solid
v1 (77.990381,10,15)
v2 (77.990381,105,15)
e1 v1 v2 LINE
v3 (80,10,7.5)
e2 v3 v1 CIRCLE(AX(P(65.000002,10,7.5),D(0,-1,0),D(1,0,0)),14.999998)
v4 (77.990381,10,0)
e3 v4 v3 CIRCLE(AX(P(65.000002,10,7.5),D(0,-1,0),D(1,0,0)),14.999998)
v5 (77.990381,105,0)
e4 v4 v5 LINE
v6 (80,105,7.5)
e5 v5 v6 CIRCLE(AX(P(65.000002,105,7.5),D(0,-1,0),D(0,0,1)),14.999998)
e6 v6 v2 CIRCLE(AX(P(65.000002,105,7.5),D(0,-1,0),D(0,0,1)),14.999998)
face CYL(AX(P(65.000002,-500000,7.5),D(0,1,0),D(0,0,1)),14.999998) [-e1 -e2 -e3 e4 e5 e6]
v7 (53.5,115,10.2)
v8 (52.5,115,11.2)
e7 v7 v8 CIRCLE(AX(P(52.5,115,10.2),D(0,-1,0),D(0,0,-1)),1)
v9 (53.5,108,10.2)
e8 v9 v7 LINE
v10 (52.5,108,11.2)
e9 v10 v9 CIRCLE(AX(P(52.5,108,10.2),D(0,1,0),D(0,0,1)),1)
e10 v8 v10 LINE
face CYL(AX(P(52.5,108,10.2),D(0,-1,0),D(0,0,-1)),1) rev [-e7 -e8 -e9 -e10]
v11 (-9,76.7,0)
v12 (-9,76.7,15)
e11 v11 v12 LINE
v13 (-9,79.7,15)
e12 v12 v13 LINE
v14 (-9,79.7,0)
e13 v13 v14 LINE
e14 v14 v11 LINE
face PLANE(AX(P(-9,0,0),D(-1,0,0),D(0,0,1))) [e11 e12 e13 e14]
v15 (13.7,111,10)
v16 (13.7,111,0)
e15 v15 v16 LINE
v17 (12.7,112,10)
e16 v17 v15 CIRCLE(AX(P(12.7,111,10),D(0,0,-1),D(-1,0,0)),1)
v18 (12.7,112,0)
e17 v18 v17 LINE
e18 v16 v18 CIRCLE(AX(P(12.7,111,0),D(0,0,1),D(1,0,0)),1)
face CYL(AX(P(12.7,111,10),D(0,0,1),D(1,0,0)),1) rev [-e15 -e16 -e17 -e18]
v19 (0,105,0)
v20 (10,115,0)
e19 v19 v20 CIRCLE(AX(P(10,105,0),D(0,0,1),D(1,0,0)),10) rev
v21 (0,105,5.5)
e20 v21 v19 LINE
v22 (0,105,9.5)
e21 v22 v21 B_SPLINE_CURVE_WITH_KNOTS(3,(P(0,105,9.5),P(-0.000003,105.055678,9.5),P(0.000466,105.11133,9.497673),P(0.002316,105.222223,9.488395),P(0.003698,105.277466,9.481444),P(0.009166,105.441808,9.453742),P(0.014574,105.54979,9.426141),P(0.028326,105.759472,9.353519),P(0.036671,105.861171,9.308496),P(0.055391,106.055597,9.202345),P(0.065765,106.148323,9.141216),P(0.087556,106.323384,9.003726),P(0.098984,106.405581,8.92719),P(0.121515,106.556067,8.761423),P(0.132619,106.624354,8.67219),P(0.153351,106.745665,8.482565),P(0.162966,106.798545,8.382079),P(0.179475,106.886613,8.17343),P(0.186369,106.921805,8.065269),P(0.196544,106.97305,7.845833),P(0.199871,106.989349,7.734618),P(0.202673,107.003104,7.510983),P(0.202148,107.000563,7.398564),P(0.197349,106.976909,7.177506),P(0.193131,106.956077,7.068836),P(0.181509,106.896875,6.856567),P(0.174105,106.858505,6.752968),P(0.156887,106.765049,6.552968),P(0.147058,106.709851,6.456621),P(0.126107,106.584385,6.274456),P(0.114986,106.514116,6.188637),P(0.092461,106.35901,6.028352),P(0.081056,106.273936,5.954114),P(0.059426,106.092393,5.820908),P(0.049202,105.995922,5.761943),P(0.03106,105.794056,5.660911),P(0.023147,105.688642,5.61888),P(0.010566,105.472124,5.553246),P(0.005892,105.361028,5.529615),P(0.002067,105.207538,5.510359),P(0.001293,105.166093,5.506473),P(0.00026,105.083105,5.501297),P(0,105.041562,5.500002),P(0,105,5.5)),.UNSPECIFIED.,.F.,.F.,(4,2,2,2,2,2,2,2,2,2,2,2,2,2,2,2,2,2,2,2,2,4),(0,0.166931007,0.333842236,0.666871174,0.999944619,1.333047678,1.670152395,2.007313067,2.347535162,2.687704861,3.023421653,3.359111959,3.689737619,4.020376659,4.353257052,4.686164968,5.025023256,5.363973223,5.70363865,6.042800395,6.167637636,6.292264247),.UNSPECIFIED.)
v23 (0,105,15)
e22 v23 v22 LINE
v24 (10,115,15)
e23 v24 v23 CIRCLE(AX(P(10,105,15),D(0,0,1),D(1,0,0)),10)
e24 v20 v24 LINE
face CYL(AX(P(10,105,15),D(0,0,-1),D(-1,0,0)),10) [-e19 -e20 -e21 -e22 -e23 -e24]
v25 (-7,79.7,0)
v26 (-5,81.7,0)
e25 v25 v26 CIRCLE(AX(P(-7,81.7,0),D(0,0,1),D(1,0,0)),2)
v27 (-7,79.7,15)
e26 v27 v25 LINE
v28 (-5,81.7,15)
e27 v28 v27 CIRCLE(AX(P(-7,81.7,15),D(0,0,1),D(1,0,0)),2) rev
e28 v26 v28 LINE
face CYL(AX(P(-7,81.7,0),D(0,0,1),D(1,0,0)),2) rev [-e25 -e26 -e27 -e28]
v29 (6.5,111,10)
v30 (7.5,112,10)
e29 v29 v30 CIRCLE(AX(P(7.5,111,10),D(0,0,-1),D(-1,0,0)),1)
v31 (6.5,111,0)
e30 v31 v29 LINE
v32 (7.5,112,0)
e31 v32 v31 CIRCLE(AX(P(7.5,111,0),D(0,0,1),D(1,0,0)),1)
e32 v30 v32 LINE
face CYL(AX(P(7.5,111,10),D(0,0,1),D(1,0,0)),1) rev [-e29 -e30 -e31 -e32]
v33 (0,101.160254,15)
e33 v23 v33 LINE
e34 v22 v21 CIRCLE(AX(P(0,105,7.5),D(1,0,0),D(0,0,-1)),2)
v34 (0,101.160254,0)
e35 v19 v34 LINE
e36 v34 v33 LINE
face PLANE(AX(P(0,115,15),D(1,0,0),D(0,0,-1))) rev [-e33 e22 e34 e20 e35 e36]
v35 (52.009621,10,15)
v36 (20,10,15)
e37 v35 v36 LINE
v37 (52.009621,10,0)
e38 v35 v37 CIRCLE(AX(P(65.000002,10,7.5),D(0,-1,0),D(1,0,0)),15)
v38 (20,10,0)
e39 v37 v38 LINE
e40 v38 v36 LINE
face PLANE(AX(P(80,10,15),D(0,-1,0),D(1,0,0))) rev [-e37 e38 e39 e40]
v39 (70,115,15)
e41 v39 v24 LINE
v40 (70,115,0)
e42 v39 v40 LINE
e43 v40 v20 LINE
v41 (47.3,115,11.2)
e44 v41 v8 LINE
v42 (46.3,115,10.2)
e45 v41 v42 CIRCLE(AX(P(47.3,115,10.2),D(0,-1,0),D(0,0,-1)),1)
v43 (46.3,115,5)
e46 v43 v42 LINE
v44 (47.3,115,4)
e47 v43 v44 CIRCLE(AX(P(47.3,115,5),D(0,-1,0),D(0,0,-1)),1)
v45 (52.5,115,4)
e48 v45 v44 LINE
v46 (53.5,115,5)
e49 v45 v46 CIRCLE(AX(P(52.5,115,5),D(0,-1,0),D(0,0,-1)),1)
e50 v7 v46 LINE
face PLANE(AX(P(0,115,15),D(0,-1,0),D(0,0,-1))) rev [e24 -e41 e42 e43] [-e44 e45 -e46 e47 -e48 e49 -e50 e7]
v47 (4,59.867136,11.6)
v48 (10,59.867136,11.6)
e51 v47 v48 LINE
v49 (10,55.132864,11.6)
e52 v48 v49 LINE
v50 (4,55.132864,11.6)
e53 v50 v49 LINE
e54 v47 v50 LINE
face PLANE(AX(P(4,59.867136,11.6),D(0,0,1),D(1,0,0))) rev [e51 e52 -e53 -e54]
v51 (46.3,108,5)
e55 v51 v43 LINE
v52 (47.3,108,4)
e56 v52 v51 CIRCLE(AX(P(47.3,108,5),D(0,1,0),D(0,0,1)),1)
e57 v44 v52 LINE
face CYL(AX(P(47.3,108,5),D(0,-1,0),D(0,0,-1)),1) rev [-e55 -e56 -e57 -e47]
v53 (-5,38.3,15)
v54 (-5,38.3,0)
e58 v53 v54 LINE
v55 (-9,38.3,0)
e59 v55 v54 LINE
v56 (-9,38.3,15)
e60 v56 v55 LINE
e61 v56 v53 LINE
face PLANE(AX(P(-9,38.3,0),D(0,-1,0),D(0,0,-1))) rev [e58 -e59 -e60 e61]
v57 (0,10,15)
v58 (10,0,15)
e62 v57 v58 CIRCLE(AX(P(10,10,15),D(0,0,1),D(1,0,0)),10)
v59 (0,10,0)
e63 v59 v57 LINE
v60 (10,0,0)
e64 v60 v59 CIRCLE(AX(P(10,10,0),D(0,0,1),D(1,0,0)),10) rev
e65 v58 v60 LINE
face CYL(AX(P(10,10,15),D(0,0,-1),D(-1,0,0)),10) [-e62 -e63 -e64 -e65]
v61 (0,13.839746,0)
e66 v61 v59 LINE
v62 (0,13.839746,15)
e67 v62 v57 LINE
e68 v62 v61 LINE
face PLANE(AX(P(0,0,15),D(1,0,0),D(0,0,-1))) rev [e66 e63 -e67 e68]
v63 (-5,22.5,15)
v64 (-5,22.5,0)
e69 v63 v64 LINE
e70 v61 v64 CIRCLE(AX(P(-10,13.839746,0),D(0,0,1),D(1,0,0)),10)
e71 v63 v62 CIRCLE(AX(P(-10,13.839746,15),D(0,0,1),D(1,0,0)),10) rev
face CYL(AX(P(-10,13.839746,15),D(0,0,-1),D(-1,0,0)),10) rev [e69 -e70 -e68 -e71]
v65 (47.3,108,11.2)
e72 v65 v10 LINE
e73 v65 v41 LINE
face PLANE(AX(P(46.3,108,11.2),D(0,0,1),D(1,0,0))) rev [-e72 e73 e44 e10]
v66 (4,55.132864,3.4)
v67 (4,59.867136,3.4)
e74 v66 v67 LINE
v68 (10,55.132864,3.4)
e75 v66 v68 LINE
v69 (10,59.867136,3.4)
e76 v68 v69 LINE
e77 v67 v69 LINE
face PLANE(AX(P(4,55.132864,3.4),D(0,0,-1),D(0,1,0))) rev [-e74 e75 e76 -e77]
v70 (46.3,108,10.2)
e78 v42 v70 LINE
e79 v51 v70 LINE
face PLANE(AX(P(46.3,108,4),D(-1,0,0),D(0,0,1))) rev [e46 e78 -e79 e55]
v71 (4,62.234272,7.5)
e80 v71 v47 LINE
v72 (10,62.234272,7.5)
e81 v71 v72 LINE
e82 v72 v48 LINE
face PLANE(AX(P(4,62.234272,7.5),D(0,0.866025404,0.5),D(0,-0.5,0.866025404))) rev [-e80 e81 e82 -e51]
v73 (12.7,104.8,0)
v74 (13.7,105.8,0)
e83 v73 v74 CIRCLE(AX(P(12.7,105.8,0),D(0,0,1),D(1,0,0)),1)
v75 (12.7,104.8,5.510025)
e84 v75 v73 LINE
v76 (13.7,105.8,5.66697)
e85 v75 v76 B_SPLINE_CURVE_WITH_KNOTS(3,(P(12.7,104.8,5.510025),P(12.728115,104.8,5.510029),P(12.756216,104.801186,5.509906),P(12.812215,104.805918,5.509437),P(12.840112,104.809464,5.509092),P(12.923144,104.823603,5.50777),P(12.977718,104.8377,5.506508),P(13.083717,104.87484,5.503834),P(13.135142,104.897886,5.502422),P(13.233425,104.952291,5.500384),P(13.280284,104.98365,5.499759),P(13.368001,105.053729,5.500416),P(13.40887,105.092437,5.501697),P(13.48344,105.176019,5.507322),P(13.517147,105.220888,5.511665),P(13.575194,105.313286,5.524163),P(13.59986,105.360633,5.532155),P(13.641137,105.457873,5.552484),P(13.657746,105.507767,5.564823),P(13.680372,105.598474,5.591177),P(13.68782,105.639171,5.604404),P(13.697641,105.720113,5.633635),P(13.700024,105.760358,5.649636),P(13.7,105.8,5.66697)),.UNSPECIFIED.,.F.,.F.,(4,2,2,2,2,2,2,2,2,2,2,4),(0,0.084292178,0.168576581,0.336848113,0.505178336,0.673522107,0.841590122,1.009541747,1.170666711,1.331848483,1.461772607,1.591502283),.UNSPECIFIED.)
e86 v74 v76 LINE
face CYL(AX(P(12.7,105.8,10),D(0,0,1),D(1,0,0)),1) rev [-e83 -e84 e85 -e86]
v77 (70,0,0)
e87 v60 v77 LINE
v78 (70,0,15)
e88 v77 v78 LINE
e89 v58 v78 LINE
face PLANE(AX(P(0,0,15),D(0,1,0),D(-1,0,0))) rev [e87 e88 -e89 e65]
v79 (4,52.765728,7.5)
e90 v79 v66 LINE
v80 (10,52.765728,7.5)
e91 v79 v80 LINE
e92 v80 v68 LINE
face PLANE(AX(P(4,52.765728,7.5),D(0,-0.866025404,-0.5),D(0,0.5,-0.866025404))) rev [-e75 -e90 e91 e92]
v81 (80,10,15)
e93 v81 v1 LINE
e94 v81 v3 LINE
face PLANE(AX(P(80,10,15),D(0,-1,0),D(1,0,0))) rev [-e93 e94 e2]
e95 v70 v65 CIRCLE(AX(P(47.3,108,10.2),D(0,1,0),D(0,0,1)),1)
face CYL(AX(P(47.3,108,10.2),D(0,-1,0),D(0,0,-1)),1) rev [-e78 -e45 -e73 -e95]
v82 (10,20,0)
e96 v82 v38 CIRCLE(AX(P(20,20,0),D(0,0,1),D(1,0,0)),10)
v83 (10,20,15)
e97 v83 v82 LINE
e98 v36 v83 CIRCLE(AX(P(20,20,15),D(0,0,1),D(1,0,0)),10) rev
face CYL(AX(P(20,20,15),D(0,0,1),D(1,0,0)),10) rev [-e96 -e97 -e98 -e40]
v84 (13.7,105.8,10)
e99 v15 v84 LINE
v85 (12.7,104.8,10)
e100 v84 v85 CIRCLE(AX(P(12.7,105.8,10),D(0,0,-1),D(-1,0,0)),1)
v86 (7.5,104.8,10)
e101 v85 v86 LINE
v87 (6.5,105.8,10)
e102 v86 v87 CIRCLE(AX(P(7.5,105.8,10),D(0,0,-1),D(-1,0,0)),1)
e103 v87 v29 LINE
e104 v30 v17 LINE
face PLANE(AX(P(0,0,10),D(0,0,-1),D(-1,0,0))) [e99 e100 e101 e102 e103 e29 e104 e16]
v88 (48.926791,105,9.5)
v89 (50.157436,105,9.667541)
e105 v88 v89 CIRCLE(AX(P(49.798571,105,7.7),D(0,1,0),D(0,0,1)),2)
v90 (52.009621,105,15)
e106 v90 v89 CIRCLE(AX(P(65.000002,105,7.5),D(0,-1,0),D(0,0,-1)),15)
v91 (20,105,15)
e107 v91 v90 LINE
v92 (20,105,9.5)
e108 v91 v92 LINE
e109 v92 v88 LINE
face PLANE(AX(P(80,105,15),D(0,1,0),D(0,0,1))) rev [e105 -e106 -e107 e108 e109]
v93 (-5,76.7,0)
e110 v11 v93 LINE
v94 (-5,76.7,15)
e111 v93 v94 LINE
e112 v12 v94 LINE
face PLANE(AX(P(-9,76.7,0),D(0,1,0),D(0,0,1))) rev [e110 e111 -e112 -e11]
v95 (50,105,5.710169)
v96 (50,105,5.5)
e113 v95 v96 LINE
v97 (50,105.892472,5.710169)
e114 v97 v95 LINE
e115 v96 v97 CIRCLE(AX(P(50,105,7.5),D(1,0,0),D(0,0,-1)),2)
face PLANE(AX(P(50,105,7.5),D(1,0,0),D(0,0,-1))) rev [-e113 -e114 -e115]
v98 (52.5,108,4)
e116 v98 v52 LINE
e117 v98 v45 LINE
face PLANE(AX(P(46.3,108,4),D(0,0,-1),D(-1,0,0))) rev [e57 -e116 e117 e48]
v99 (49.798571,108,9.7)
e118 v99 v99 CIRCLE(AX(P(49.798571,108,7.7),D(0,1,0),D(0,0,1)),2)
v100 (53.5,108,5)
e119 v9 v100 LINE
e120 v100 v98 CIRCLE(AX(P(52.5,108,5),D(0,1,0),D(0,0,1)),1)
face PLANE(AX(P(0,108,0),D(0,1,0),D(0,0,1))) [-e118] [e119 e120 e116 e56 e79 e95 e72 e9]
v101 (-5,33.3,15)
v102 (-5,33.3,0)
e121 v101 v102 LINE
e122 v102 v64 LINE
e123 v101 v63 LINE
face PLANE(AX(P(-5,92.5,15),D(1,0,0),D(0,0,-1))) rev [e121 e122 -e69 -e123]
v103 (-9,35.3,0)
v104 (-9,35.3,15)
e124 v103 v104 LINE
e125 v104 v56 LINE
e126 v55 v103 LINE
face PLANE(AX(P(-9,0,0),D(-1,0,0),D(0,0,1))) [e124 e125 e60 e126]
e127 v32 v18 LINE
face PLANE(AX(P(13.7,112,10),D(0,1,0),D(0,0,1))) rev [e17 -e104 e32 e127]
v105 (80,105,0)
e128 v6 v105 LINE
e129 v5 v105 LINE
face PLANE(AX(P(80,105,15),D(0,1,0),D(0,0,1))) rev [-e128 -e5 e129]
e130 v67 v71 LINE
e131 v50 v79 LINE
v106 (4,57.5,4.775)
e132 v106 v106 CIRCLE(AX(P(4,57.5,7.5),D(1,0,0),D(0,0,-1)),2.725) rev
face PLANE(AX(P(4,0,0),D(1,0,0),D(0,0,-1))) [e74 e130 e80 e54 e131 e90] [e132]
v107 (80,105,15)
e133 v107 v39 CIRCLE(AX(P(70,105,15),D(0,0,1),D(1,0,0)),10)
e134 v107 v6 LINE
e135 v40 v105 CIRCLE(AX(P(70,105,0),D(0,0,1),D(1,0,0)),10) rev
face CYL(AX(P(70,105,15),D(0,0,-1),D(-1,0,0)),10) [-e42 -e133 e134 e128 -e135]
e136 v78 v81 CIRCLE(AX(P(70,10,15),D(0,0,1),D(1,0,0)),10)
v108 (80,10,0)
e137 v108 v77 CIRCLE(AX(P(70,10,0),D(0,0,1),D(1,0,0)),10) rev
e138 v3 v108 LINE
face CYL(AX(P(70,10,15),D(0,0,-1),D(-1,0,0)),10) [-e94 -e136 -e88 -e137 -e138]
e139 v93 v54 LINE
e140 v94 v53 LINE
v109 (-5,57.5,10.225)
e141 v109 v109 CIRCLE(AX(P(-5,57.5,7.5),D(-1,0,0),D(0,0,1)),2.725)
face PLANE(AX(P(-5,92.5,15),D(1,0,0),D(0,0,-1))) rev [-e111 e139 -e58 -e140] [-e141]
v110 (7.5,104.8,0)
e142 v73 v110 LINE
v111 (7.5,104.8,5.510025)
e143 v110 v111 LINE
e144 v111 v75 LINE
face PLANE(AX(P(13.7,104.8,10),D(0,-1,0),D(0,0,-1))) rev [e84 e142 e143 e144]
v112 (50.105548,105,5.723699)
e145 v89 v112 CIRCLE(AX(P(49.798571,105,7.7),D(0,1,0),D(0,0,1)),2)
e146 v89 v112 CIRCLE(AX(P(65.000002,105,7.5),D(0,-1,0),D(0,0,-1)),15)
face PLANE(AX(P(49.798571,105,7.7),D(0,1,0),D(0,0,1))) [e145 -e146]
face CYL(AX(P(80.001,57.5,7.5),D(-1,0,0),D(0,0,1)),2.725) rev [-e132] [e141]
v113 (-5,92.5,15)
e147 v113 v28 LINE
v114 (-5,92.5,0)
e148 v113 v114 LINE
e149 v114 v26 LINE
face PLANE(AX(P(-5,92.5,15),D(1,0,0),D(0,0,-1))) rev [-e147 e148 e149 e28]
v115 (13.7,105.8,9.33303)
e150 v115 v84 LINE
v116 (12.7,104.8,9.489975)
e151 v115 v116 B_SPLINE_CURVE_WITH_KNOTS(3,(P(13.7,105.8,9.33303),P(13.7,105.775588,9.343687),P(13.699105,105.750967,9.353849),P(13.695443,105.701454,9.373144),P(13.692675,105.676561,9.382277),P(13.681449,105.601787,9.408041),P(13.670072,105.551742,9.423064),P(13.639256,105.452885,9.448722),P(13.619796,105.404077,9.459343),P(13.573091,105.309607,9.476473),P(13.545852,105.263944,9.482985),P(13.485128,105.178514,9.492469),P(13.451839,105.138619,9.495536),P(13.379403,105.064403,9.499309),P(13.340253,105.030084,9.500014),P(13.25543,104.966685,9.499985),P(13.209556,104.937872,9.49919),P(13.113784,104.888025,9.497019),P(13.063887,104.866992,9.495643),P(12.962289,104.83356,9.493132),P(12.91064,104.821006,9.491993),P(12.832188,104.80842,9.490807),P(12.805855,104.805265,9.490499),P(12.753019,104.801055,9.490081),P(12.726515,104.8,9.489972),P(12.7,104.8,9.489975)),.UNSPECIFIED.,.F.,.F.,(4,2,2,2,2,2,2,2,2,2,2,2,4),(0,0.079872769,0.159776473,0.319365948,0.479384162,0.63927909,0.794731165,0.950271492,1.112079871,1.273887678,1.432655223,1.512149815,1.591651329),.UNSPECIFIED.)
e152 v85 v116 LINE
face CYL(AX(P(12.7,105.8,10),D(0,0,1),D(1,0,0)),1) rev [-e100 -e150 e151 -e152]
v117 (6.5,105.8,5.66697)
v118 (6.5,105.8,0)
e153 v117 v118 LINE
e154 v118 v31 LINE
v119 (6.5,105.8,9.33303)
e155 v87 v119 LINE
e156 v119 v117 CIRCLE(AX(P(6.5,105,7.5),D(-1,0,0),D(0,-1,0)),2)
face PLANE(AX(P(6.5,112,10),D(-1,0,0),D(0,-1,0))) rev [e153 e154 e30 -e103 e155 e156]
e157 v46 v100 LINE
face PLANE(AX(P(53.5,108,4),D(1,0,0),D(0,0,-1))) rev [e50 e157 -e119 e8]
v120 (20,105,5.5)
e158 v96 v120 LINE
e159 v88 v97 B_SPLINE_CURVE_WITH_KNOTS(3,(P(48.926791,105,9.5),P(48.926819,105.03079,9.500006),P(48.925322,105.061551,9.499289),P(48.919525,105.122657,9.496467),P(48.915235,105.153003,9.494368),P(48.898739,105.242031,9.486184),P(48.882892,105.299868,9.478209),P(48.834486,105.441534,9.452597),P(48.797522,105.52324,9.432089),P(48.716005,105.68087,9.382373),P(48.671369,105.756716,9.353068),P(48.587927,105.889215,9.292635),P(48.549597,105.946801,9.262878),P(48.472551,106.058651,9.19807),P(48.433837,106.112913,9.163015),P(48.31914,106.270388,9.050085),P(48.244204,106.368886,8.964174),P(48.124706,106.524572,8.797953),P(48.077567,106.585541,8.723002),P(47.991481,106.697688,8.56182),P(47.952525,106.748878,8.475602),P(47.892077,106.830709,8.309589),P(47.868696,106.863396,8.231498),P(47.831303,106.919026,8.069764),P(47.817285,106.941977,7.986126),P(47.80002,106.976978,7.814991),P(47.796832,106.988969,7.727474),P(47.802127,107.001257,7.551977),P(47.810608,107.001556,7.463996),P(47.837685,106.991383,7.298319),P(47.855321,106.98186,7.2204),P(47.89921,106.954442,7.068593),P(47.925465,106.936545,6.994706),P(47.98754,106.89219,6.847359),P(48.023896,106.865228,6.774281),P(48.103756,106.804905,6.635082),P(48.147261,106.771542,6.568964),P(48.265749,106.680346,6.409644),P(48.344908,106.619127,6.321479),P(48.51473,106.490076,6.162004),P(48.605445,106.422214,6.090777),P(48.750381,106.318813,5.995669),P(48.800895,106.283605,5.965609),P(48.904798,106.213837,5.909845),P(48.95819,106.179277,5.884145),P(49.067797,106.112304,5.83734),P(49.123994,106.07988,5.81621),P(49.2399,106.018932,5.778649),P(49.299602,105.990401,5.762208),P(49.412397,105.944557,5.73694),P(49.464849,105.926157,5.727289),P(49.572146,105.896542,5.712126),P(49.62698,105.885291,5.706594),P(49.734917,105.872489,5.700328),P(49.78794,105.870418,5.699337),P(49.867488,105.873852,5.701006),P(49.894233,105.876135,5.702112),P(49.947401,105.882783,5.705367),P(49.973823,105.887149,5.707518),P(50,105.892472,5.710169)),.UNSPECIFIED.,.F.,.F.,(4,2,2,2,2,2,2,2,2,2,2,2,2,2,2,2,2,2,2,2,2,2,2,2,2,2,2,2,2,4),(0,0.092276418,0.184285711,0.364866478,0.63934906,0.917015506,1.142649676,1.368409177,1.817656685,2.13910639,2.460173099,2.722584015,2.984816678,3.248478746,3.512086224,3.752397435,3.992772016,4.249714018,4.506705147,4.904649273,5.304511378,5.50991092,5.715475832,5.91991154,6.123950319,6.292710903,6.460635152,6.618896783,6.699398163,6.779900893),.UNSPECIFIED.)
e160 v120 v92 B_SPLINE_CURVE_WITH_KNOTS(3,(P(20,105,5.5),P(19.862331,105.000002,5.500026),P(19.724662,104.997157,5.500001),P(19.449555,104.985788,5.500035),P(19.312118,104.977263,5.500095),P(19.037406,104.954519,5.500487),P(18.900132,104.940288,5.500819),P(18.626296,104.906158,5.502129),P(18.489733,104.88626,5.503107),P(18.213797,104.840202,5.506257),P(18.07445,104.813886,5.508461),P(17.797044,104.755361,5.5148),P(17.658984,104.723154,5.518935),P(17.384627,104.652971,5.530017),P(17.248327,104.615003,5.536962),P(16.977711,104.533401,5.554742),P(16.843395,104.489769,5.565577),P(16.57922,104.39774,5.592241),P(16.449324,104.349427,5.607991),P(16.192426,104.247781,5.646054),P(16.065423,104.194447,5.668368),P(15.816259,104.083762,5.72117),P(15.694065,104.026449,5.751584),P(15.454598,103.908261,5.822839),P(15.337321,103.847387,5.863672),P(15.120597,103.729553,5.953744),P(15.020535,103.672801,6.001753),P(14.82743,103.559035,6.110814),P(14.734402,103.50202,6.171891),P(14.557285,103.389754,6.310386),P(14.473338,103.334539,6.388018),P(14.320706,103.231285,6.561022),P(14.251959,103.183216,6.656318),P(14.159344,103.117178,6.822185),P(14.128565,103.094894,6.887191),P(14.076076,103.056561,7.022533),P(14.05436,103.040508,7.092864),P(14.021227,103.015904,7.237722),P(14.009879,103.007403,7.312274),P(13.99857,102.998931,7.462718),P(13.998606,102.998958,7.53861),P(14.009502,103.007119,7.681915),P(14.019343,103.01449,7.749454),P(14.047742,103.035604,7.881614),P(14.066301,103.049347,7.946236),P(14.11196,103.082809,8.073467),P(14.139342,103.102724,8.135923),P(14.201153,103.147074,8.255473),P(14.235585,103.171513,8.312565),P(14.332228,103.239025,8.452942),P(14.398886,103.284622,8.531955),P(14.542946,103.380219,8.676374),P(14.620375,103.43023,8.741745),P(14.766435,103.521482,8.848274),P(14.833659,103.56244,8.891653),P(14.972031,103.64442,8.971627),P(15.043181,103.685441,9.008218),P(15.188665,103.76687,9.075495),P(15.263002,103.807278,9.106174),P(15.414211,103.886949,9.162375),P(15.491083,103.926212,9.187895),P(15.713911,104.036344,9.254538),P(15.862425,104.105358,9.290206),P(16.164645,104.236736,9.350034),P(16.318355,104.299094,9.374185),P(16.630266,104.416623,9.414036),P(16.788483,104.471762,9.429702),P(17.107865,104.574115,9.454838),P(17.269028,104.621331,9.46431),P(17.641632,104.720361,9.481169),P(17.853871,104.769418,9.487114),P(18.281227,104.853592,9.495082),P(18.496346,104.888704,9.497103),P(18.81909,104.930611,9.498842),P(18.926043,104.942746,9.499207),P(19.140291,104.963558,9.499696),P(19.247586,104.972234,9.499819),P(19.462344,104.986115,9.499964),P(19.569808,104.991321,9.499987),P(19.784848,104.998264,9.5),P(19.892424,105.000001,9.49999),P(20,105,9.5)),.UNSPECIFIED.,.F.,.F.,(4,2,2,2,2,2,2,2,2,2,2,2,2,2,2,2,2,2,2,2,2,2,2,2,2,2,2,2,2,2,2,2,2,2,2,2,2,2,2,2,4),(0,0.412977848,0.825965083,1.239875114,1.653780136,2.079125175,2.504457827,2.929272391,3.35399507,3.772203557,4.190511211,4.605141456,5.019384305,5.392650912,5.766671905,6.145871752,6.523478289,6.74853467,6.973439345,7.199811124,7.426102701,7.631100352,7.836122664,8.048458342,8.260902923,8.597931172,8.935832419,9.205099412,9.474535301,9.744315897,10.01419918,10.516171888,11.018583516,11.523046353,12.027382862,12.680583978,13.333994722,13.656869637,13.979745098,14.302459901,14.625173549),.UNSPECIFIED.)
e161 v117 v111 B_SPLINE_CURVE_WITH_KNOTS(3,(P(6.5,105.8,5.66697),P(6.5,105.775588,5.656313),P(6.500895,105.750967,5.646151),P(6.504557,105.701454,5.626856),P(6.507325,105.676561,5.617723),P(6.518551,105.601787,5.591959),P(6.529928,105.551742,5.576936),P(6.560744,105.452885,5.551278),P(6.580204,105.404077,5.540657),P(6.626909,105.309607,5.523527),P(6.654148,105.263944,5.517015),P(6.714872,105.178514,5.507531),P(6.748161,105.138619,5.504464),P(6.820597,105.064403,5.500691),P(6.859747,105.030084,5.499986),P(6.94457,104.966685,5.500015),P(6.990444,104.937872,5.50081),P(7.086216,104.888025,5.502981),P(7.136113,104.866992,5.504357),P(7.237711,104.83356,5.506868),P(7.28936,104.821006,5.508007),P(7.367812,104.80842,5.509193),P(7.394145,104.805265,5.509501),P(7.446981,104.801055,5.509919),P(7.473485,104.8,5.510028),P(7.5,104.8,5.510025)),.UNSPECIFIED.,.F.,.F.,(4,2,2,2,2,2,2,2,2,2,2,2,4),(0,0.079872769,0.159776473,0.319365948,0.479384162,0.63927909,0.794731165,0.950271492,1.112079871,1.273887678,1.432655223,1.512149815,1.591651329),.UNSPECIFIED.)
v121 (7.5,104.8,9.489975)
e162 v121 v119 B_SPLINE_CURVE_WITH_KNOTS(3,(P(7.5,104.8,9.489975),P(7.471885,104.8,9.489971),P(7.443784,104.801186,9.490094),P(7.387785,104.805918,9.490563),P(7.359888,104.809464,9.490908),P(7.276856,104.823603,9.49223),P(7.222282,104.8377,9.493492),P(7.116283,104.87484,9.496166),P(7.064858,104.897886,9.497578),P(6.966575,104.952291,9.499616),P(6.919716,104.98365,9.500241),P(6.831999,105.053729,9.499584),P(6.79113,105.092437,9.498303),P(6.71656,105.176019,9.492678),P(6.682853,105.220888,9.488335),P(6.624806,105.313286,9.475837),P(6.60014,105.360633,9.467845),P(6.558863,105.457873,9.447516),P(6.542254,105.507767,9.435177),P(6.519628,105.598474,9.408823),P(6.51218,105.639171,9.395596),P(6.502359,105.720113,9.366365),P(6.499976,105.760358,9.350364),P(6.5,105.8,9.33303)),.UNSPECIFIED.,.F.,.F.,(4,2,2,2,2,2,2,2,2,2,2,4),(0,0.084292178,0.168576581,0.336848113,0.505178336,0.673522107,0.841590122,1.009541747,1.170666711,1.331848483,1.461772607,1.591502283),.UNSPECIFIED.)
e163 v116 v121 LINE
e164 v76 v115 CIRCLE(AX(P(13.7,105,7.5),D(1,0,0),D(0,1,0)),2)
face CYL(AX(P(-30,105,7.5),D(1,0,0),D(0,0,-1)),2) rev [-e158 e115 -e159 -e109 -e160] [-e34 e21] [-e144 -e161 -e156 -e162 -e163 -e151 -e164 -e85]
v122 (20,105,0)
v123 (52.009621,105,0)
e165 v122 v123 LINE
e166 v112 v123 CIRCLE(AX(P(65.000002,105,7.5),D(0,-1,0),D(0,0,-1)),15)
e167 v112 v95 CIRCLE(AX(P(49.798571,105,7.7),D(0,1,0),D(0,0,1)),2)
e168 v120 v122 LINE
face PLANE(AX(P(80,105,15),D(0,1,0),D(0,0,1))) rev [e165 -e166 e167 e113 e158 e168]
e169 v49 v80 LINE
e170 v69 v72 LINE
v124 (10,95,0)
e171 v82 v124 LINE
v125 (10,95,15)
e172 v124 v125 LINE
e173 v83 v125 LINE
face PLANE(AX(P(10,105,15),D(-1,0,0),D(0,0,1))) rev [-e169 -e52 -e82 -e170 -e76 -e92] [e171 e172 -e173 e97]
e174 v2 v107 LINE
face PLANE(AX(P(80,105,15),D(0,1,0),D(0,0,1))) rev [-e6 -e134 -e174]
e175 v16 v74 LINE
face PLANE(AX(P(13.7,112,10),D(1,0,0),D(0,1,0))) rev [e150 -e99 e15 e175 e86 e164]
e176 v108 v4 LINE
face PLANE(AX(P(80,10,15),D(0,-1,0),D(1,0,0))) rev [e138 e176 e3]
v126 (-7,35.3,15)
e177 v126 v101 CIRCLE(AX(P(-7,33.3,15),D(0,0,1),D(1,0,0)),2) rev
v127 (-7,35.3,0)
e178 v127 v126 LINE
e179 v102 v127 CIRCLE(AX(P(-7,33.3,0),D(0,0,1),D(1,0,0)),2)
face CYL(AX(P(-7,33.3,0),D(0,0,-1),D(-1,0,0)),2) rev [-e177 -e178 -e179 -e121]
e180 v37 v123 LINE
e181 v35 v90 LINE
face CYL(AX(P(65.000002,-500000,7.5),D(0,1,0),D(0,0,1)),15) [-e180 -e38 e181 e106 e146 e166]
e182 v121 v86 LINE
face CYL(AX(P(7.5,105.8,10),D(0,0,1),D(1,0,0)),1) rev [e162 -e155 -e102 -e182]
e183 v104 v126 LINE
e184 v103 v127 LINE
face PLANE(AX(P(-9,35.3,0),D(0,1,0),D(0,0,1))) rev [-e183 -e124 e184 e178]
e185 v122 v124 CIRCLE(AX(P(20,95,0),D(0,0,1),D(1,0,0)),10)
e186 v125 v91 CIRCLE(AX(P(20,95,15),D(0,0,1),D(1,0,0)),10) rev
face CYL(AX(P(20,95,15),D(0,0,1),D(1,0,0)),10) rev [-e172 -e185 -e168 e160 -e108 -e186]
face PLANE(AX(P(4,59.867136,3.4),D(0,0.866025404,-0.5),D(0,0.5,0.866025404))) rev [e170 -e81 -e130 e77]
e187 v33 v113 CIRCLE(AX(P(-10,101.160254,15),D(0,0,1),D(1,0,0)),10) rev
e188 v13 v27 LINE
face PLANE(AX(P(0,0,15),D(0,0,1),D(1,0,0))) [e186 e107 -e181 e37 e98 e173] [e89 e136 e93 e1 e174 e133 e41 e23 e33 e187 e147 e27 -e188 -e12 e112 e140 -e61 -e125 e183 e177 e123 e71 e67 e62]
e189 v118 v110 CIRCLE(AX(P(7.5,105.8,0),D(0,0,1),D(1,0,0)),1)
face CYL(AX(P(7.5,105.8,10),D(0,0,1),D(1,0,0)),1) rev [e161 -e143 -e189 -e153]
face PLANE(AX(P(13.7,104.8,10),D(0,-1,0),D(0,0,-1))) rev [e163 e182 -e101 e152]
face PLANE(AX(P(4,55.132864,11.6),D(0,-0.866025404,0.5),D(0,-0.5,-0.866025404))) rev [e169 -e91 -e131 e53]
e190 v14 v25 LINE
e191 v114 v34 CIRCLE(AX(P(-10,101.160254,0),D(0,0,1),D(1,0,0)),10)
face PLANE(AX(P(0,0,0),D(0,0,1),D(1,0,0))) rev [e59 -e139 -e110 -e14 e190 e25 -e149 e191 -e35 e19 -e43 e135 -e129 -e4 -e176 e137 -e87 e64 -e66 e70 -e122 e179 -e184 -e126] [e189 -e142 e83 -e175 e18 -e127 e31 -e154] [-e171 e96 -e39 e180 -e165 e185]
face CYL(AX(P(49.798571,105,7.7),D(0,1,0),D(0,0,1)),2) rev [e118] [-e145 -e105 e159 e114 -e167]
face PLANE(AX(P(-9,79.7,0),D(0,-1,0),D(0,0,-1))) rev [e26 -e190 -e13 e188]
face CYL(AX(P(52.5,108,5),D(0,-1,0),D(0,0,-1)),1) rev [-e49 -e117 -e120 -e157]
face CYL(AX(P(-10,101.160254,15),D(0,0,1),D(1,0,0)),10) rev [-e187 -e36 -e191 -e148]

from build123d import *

# Parameters (mm, degrees)
MAIN_BODY_DEPTH             = 15
M5_HOLE_REACH               = 145.788
SKETCH2_R                   = 2.725
GRIP_REACH                  = 134.853
SKETCH8_W                   = 7.2
SKETCH8_H                   = 7.2
BUTTON_1_DEPTH              = 7
SKETCH9_R                   = 2
HOLE_WIRES_BUTTON_1_DEPTH   = 3
OUTER_FILLET_R              = 10
SKETCH13_W                  = 7.2
SKETCH13_H                  = 7.2
BUTTON_2_DEPTH              = 10
BUTTONS_FILLET_R            = 1
SKETCH16_R                  = 2
WIRE_ROUTING_DEPTH          = 40
M5_NUT_DEPTH                = 6
SKETCH18_W                  = 15
SKETCH18_H                  = 3
DOVETAIL_MALE_SLOT_DEPTH    = 4
DOVETAIL_MALE_SLOT_FILLET_R = 2


with BuildPart() as part:
    # Model → Main Body (new body)
    with BuildSketch(Plane.XY):
        Polygon((80, 115), (80, 105), (10, 105), (10, 10), (80, 10), (80, 0), (0, 0), (0, 22.5), (-5, 22.5), (-5, 92.5), (0, 92.5), (0, 115), align=None)
    extrude(amount=MAIN_BODY_DEPTH)

    # Sketch2 → M5 Hole (cut, up to next)
    with BuildSketch(Plane.ZY.offset(5), mode=Mode.PRIVATE) as m5_hole_sk1:
        with Locations((7.5, 57.5)):
            Circle(SKETCH2_R)
    m5_hole_tool1 = extrude(m5_hole_sk1.sketch, amount=-M5_HOLE_REACH, mode=Mode.PRIVATE) & part.part
    add(m5_hole_tool1.solids().sort_by_distance((-5, 57.5, 7.5))[0], mode=Mode.SUBTRACT)

    # Sketch6 → Grip (add, up to next)
    with BuildSketch(Plane.XZ.offset(-105), mode=Mode.PRIVATE) as grip_sk1:
        with BuildLine():
            Line((52.009621164, 15), (77.990380713, 15))
            ThreePointArc((77.990380713, 15), (80, 7.5), (77.990380713, 0))
            Line((77.990380713, 0), (52.009621164, 0))
            ThreePointArc((52.009621164, 0), (50.000002221, 7.5), (52.009621164, 15))
        make_face()
    grip_tool1 = extrude(grip_sk1.sketch, amount=GRIP_REACH, mode=Mode.PRIVATE) - part.part
    add(grip_tool1.solids().sort_by_distance((65.000001, 105, 7.5))[0])

    # Sketch8 → Button 1 (cut)
    with BuildSketch(Plane(origin=(0, 115, 0), x_dir=(1, 0, 0), z_dir=(0, 1, 0))):
        with Locations((49.9, -7.6)):
            Rectangle(SKETCH8_W, SKETCH8_H)
    extrude(amount=-BUTTON_1_DEPTH, mode=Mode.SUBTRACT)

    # Sketch9 → Hole Wires Button 1 (cut)
    with BuildSketch(Plane(origin=(0, 108, 0), x_dir=(1, 0, 0), z_dir=(0, 1, 0))):
        with Locations(Location((49.798571137, -7.7, 0), (0, 0, 270))):
            Circle(SKETCH9_R)
    extrude(amount=-HOLE_WIRES_BUTTON_1_DEPTH, mode=Mode.SUBTRACT)

    # Outer Fillet
    # the kernel refuses this fillet: 10 mm, written as the material it adds along each edge
    with BuildSketch(Plane(origin=(0, 22.5, 0), x_dir=(-1, 0, 0), z_dir=(0, 0, 1))) as outer_fillet_piece_1:
        with BuildLine():
            CenterArc((10, 8.660254038), OUTER_FILLET_R, 180, 60)
            Line((0, 8.660254038), (0, 0))
            Line((0, 0), (5, 0))
        make_face()
    extrude(amount=15)
    with BuildSketch(Plane(origin=(10, 10, 0), x_dir=(1, 0, 0), z_dir=(0, 0, 1)), Plane(origin=(10, 105, 0), x_dir=(0, -1, 0), z_dir=(0, 0, 1))) as outer_fillet_piece_2:
        with BuildLine():
            CenterArc((OUTER_FILLET_R, OUTER_FILLET_R), OUTER_FILLET_R, 180, 90)
            Line((0, OUTER_FILLET_R), (0, 0))
            Line((0, 0), (OUTER_FILLET_R, 0))
        make_face()
    extrude(amount=15)
    with BuildSketch(Plane(origin=(0, 92.5, 0), x_dir=(0, 1, 0), z_dir=(0, 0, 1))) as outer_fillet_piece_3:
        with BuildLine():
            CenterArc((8.660254038, 10), OUTER_FILLET_R, 210, 60)
            Line((0, 5), (0, 0))
            Line((0, 0), (8.660254038, 0))
        make_face()
    extrude(amount=15)
    # the kernel refuses this fillet: 10 mm, written as the material it takes off along each edge
    with BuildSketch(Plane(origin=(80, 115, -25), x_dir=(0, -1, 0), z_dir=(0, 0, 1)), Plane(origin=(80, 0, -25), x_dir=(-1, 0, 0), z_dir=(0, 0, 1)), Plane(origin=(0, 0, -25), x_dir=(0, 1, 0), z_dir=(0, 0, 1)), Plane(origin=(0, 115, -25), x_dir=(1, 0, 0), z_dir=(0, 0, 1))) as outer_fillet_2_piece_1:
        with BuildLine():
            CenterArc((OUTER_FILLET_R, -OUTER_FILLET_R), OUTER_FILLET_R, 90, 90)
            Line((0, -OUTER_FILLET_R), (0, 0))
            Line((0, 0), (OUTER_FILLET_R, 0))
        make_face()
    extrude(amount=65, mode=Mode.SUBTRACT)

    # Sketch13 → Button 2 (cut)
    with BuildSketch(Plane(origin=(0, 0, 0), x_dir=(-1, 0, 0), z_dir=(0, 0, -1))):
        with Locations((-10.1, 108.4)):
            Rectangle(SKETCH13_W, SKETCH13_H)
    extrude(amount=-BUTTON_2_DEPTH, mode=Mode.SUBTRACT)

    # Buttons Fillet
    buttons_fillet_edges = [part.edges().sort_by_distance(p)[0] for p in [
        (6.5, 112, 5),
        (6.5, 104.8, 5),
        (13.7, 104.8, 5),
        (13.7, 112, 5),
        (53.5, 111.5, 4),
        (53.5, 111.5, 11.2),
        (46.3, 111.5, 11.2),
        (46.3, 111.5, 4),
    ]]
    fillet(buttons_fillet_edges, radius=BUTTONS_FILLET_R)

    # Sketch16 → Wire Routing (cut, symmetric)
    with BuildSketch(Plane(origin=(10, 0, 0), x_dir=(0, 0, -1), z_dir=(1, 0, 0))):
        with Locations((-7.5, 105)):
            Circle(SKETCH16_R)
    extrude(amount=WIRE_ROUTING_DEPTH, both=True, mode=Mode.SUBTRACT)

    # Sketch17 → M5 Nut (cut)
    with BuildSketch(Plane(origin=(10, 0, 0), x_dir=(0, 0, -1), z_dir=(1, 0, 0))):
        Polygon((-7.5, 62.234272207), (-11.6, 59.867136104), (-11.6, 55.132863896), (-7.5, 52.765727793), (-3.4, 55.132863896), (-3.4, 59.867136104), align=None)
    extrude(amount=-M5_NUT_DEPTH, mode=Mode.SUBTRACT)

    # Sketch18 → Dovetail Male Slot (add)
    with BuildSketch(Plane.ZY.offset(5)):
        with Locations((7.5, 78.2)):
            Rectangle(SKETCH18_W, SKETCH18_H)
        with Locations((7.5, 36.8)):
            Rectangle(SKETCH18_W, SKETCH18_H)
    extrude(amount=DOVETAIL_MALE_SLOT_DEPTH)

    # Dovetail Male Slot Fillet
    dovetail_male_slot_fillet_edges = [part.edges().sort_by_distance(p)[0] for p in [
        (-5, 79.7, 7.5),
        (-5, 35.3, 7.5),
    ]]
    fillet(dovetail_male_slot_fillet_edges, radius=DOVETAIL_MALE_SLOT_FILLET_R)


solid = part.part
